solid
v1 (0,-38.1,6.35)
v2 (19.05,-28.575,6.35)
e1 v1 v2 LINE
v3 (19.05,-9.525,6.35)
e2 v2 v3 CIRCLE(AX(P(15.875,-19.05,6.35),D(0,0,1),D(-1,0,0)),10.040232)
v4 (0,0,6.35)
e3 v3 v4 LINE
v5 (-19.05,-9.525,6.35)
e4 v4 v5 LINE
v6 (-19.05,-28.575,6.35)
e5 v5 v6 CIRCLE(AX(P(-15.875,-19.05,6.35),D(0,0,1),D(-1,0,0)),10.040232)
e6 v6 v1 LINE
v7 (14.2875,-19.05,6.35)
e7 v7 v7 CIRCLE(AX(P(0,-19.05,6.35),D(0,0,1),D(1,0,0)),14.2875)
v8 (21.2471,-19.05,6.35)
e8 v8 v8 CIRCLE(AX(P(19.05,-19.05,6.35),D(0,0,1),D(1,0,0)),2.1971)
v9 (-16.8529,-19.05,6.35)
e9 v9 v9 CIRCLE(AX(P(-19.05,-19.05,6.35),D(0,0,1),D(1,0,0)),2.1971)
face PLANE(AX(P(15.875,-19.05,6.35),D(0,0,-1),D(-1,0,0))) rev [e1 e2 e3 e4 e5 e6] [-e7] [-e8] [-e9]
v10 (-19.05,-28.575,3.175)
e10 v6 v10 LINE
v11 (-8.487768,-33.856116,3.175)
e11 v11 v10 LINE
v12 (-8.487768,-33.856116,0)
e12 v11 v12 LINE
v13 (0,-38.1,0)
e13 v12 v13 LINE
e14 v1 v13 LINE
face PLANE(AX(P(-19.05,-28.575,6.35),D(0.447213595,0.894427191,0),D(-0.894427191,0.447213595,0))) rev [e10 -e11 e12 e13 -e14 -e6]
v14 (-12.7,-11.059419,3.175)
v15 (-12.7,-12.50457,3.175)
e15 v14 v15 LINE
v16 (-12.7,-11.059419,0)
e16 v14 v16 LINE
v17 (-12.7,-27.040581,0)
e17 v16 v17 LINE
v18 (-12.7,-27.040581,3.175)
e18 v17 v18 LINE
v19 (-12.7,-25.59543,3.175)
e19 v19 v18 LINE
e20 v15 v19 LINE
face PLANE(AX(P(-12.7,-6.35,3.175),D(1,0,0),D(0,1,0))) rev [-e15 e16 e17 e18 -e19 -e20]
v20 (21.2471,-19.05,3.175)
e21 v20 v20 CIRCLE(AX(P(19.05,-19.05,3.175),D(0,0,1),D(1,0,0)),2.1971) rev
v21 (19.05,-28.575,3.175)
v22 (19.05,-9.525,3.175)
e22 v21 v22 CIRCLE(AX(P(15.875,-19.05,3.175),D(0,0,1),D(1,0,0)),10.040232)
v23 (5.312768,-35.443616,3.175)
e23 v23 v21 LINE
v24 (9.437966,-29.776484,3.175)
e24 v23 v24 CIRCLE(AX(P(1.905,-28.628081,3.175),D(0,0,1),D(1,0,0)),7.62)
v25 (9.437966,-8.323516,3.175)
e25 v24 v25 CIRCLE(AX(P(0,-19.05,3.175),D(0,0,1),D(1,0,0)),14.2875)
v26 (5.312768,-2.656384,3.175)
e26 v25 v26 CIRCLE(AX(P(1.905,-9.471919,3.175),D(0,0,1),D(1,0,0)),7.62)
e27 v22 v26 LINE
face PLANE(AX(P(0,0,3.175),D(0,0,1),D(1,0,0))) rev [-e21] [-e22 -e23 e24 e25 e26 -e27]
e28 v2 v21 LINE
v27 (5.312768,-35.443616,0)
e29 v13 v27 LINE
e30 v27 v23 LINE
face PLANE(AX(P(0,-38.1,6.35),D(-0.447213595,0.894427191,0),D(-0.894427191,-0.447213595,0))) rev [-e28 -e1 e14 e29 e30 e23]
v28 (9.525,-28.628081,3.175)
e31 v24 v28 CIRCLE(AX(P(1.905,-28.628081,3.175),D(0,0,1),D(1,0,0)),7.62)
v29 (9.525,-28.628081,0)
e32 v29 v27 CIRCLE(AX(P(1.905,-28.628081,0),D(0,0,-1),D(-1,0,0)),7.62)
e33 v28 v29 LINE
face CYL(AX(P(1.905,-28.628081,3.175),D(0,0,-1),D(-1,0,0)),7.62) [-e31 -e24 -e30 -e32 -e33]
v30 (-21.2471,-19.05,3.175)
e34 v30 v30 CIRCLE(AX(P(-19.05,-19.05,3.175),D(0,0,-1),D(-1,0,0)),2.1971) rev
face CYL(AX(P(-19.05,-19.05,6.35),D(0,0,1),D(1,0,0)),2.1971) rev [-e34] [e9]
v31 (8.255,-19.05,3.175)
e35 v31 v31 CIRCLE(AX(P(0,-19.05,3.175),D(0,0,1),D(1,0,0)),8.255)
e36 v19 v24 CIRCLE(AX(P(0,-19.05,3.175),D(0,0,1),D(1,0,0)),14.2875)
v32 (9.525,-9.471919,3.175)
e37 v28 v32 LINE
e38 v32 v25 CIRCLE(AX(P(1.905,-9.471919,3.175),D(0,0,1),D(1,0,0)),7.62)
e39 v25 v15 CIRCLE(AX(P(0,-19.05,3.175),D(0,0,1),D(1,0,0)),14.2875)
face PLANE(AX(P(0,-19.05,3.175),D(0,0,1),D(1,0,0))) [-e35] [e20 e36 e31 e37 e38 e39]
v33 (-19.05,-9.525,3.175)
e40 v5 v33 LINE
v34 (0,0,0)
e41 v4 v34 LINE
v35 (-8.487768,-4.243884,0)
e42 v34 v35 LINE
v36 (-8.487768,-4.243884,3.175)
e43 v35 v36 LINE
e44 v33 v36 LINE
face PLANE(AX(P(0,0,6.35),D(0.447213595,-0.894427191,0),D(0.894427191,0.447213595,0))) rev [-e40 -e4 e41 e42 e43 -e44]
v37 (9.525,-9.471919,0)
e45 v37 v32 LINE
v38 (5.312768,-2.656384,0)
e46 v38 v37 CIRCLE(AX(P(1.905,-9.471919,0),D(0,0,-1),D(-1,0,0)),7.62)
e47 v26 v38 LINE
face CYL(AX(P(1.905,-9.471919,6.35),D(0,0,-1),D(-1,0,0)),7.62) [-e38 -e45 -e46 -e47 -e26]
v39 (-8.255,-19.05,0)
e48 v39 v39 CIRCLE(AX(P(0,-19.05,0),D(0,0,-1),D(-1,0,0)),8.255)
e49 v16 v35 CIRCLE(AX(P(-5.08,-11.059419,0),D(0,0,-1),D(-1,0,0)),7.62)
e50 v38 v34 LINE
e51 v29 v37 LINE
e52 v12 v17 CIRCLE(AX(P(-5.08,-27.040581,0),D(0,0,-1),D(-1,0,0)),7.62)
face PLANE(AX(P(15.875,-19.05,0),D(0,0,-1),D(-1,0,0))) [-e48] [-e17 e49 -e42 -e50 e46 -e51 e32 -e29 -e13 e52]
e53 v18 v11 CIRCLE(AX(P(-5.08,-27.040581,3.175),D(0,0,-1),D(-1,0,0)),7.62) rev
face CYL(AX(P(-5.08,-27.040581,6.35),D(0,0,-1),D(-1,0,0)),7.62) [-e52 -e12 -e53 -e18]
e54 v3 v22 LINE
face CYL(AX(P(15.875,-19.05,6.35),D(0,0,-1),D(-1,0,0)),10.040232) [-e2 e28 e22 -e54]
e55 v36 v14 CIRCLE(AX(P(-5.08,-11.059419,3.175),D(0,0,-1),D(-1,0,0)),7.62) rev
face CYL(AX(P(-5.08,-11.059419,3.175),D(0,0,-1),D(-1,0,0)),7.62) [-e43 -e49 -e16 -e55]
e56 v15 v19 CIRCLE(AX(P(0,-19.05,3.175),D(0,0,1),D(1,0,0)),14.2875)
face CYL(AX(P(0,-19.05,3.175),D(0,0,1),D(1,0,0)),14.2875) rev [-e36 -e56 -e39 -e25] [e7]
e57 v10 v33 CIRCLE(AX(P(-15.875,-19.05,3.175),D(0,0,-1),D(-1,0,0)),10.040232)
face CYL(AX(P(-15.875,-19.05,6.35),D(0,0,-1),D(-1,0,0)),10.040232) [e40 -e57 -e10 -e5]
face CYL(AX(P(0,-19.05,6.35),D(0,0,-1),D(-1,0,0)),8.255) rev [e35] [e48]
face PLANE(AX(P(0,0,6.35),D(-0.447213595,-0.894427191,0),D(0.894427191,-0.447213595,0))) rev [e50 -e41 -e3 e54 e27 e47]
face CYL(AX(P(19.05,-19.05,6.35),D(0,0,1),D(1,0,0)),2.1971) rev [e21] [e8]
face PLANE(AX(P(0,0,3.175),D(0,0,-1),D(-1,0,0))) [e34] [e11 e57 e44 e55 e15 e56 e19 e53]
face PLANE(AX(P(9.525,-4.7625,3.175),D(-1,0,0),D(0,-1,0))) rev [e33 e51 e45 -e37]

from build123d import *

# Parameters (mm, degrees)
BOSS_EXTRUDE1_DEPTH         = 6.35
TAP_DRILL_FOR_8_HELICOIL2_D = 4.3942
SKETCH5_R                   = 14.2875
CUT_EXTRUDE1_DEPTH          = 3.175
SKETCH6_W                   = 13.215231571
SKETCH6_H                   = 25.4
SKETCH6_W_2                 = 16.390231571
SKETCH6_H_2                 = 28.575
CUT_EXTRUDE2_DEPTH          = 3.175
FILLET1_R                   = 7.62
SKETCH7_R                   = 8.255
CUT_EXTRUDE3_DEPTH          = 47.513779973


with BuildPart() as part:
    # Sketch2 → Boss-Extrude1 (new body)
    with BuildSketch(Plane.XY):
        with BuildLine():
            Line((0, 0), (-19.05, -9.525))
            ThreePointArc((-19.05, -9.525), (-25.915231571, -19.05), (-19.05, -28.575))
            Line((-19.05, -28.575), (0, -38.1))
            Line((0, -38.1), (19.05, -28.575))
            ThreePointArc((19.05, -28.575), (25.915231571, -19.05), (19.05, -9.525))
            Line((19.05, -9.525), (0, 0))
        make_face()
    extrude(amount=BOSS_EXTRUDE1_DEPTH)

    # Tap Drill for #8 Helicoil2 (through all)
    with Locations(Plane.XY.offset(6.35)):
        with Locations((-19.05, -19.05), (19.05, -19.05)):
            Hole(TAP_DRILL_FOR_8_HELICOIL2_D / 2)

    # Sketch5 → Cut-Extrude1 (cut)
    with BuildSketch(Plane.XY.offset(6.35)):
        with Locations((0, -19.05)):
            Circle(SKETCH5_R)
    extrude(amount=-CUT_EXTRUDE1_DEPTH, mode=Mode.SUBTRACT)

    # Sketch6 → Cut-Extrude2 (cut)
    with BuildSketch(Plane(origin=(0, 0, 0), x_dir=(-1, 0, 0), z_dir=(0, 0, -1))):
        with Locations((19.307615786, -19.05)):
            Rectangle(SKETCH6_W, SKETCH6_H)
        with Locations((-17.720115786, -19.05)):
            Rectangle(SKETCH6_W_2, SKETCH6_H_2)
    extrude(amount=-CUT_EXTRUDE2_DEPTH, mode=Mode.SUBTRACT)

    # Fillet1
    # the kernel refuses this fillet: 7.62 mm, written as the material it takes off along each edge
    with BuildSketch(Plane(origin=(-12.7, -31.75, -11.773547486), x_dir=(0.8944271909999157, -0.44721359549995826, 0), z_dir=(0, 0, 1)), Plane(origin=(-12.7, -6.35, -11.773547486), x_dir=(0, -1, 0), z_dir=(0, 0, 1)), Plane(origin=(9.525, -4.7625, -11.773547486), x_dir=(-0.894427190999916, 0.4472135954999576, 0), z_dir=(0, 0, 1))) as fillet1_piece_1:
        with BuildLine():
            CenterArc((FILLET1_R * 0.61803398875, FILLET1_R), FILLET1_R, 206.565051177, 63.434948823)
            Line((-FILLET1_R * 0.27639320225, FILLET1_R * 0.5527864045), (0, 0))
            Line((0, 0), (FILLET1_R * 0.61803398875, 0))
        make_face()
    extrude(amount=14.948547486, mode=Mode.SUBTRACT)
    with BuildSketch(Plane(origin=(9.525, -33.3375, -11.773547486), x_dir=(-0.8944271909999163, -0.4472135954999572, 0), z_dir=(0, 0, 1))) as fillet1_piece_2:
        with BuildLine():
            CenterArc((FILLET1_R * 0.61803398875, -FILLET1_R), FILLET1_R, 90, 63.434948823)
            Line((-FILLET1_R * 0.27639320225, -FILLET1_R * 0.5527864045), (0, 0))
            Line((0, 0), (FILLET1_R * 0.61803398875, 0))
        make_face()
    extrude(amount=14.948547486, mode=Mode.SUBTRACT)

    # Sketch7 → Cut-Extrude3 (cut, through all)
    with BuildSketch(Plane(origin=(0, 0, 0), x_dir=(-1, 0, 0), z_dir=(0, 0, -1))):
        with Locations((0, -19.05)):
            Circle(SKETCH7_R)
    extrude(amount=-CUT_EXTRUDE3_DEPTH, mode=Mode.SUBTRACT)


solid = part.part
